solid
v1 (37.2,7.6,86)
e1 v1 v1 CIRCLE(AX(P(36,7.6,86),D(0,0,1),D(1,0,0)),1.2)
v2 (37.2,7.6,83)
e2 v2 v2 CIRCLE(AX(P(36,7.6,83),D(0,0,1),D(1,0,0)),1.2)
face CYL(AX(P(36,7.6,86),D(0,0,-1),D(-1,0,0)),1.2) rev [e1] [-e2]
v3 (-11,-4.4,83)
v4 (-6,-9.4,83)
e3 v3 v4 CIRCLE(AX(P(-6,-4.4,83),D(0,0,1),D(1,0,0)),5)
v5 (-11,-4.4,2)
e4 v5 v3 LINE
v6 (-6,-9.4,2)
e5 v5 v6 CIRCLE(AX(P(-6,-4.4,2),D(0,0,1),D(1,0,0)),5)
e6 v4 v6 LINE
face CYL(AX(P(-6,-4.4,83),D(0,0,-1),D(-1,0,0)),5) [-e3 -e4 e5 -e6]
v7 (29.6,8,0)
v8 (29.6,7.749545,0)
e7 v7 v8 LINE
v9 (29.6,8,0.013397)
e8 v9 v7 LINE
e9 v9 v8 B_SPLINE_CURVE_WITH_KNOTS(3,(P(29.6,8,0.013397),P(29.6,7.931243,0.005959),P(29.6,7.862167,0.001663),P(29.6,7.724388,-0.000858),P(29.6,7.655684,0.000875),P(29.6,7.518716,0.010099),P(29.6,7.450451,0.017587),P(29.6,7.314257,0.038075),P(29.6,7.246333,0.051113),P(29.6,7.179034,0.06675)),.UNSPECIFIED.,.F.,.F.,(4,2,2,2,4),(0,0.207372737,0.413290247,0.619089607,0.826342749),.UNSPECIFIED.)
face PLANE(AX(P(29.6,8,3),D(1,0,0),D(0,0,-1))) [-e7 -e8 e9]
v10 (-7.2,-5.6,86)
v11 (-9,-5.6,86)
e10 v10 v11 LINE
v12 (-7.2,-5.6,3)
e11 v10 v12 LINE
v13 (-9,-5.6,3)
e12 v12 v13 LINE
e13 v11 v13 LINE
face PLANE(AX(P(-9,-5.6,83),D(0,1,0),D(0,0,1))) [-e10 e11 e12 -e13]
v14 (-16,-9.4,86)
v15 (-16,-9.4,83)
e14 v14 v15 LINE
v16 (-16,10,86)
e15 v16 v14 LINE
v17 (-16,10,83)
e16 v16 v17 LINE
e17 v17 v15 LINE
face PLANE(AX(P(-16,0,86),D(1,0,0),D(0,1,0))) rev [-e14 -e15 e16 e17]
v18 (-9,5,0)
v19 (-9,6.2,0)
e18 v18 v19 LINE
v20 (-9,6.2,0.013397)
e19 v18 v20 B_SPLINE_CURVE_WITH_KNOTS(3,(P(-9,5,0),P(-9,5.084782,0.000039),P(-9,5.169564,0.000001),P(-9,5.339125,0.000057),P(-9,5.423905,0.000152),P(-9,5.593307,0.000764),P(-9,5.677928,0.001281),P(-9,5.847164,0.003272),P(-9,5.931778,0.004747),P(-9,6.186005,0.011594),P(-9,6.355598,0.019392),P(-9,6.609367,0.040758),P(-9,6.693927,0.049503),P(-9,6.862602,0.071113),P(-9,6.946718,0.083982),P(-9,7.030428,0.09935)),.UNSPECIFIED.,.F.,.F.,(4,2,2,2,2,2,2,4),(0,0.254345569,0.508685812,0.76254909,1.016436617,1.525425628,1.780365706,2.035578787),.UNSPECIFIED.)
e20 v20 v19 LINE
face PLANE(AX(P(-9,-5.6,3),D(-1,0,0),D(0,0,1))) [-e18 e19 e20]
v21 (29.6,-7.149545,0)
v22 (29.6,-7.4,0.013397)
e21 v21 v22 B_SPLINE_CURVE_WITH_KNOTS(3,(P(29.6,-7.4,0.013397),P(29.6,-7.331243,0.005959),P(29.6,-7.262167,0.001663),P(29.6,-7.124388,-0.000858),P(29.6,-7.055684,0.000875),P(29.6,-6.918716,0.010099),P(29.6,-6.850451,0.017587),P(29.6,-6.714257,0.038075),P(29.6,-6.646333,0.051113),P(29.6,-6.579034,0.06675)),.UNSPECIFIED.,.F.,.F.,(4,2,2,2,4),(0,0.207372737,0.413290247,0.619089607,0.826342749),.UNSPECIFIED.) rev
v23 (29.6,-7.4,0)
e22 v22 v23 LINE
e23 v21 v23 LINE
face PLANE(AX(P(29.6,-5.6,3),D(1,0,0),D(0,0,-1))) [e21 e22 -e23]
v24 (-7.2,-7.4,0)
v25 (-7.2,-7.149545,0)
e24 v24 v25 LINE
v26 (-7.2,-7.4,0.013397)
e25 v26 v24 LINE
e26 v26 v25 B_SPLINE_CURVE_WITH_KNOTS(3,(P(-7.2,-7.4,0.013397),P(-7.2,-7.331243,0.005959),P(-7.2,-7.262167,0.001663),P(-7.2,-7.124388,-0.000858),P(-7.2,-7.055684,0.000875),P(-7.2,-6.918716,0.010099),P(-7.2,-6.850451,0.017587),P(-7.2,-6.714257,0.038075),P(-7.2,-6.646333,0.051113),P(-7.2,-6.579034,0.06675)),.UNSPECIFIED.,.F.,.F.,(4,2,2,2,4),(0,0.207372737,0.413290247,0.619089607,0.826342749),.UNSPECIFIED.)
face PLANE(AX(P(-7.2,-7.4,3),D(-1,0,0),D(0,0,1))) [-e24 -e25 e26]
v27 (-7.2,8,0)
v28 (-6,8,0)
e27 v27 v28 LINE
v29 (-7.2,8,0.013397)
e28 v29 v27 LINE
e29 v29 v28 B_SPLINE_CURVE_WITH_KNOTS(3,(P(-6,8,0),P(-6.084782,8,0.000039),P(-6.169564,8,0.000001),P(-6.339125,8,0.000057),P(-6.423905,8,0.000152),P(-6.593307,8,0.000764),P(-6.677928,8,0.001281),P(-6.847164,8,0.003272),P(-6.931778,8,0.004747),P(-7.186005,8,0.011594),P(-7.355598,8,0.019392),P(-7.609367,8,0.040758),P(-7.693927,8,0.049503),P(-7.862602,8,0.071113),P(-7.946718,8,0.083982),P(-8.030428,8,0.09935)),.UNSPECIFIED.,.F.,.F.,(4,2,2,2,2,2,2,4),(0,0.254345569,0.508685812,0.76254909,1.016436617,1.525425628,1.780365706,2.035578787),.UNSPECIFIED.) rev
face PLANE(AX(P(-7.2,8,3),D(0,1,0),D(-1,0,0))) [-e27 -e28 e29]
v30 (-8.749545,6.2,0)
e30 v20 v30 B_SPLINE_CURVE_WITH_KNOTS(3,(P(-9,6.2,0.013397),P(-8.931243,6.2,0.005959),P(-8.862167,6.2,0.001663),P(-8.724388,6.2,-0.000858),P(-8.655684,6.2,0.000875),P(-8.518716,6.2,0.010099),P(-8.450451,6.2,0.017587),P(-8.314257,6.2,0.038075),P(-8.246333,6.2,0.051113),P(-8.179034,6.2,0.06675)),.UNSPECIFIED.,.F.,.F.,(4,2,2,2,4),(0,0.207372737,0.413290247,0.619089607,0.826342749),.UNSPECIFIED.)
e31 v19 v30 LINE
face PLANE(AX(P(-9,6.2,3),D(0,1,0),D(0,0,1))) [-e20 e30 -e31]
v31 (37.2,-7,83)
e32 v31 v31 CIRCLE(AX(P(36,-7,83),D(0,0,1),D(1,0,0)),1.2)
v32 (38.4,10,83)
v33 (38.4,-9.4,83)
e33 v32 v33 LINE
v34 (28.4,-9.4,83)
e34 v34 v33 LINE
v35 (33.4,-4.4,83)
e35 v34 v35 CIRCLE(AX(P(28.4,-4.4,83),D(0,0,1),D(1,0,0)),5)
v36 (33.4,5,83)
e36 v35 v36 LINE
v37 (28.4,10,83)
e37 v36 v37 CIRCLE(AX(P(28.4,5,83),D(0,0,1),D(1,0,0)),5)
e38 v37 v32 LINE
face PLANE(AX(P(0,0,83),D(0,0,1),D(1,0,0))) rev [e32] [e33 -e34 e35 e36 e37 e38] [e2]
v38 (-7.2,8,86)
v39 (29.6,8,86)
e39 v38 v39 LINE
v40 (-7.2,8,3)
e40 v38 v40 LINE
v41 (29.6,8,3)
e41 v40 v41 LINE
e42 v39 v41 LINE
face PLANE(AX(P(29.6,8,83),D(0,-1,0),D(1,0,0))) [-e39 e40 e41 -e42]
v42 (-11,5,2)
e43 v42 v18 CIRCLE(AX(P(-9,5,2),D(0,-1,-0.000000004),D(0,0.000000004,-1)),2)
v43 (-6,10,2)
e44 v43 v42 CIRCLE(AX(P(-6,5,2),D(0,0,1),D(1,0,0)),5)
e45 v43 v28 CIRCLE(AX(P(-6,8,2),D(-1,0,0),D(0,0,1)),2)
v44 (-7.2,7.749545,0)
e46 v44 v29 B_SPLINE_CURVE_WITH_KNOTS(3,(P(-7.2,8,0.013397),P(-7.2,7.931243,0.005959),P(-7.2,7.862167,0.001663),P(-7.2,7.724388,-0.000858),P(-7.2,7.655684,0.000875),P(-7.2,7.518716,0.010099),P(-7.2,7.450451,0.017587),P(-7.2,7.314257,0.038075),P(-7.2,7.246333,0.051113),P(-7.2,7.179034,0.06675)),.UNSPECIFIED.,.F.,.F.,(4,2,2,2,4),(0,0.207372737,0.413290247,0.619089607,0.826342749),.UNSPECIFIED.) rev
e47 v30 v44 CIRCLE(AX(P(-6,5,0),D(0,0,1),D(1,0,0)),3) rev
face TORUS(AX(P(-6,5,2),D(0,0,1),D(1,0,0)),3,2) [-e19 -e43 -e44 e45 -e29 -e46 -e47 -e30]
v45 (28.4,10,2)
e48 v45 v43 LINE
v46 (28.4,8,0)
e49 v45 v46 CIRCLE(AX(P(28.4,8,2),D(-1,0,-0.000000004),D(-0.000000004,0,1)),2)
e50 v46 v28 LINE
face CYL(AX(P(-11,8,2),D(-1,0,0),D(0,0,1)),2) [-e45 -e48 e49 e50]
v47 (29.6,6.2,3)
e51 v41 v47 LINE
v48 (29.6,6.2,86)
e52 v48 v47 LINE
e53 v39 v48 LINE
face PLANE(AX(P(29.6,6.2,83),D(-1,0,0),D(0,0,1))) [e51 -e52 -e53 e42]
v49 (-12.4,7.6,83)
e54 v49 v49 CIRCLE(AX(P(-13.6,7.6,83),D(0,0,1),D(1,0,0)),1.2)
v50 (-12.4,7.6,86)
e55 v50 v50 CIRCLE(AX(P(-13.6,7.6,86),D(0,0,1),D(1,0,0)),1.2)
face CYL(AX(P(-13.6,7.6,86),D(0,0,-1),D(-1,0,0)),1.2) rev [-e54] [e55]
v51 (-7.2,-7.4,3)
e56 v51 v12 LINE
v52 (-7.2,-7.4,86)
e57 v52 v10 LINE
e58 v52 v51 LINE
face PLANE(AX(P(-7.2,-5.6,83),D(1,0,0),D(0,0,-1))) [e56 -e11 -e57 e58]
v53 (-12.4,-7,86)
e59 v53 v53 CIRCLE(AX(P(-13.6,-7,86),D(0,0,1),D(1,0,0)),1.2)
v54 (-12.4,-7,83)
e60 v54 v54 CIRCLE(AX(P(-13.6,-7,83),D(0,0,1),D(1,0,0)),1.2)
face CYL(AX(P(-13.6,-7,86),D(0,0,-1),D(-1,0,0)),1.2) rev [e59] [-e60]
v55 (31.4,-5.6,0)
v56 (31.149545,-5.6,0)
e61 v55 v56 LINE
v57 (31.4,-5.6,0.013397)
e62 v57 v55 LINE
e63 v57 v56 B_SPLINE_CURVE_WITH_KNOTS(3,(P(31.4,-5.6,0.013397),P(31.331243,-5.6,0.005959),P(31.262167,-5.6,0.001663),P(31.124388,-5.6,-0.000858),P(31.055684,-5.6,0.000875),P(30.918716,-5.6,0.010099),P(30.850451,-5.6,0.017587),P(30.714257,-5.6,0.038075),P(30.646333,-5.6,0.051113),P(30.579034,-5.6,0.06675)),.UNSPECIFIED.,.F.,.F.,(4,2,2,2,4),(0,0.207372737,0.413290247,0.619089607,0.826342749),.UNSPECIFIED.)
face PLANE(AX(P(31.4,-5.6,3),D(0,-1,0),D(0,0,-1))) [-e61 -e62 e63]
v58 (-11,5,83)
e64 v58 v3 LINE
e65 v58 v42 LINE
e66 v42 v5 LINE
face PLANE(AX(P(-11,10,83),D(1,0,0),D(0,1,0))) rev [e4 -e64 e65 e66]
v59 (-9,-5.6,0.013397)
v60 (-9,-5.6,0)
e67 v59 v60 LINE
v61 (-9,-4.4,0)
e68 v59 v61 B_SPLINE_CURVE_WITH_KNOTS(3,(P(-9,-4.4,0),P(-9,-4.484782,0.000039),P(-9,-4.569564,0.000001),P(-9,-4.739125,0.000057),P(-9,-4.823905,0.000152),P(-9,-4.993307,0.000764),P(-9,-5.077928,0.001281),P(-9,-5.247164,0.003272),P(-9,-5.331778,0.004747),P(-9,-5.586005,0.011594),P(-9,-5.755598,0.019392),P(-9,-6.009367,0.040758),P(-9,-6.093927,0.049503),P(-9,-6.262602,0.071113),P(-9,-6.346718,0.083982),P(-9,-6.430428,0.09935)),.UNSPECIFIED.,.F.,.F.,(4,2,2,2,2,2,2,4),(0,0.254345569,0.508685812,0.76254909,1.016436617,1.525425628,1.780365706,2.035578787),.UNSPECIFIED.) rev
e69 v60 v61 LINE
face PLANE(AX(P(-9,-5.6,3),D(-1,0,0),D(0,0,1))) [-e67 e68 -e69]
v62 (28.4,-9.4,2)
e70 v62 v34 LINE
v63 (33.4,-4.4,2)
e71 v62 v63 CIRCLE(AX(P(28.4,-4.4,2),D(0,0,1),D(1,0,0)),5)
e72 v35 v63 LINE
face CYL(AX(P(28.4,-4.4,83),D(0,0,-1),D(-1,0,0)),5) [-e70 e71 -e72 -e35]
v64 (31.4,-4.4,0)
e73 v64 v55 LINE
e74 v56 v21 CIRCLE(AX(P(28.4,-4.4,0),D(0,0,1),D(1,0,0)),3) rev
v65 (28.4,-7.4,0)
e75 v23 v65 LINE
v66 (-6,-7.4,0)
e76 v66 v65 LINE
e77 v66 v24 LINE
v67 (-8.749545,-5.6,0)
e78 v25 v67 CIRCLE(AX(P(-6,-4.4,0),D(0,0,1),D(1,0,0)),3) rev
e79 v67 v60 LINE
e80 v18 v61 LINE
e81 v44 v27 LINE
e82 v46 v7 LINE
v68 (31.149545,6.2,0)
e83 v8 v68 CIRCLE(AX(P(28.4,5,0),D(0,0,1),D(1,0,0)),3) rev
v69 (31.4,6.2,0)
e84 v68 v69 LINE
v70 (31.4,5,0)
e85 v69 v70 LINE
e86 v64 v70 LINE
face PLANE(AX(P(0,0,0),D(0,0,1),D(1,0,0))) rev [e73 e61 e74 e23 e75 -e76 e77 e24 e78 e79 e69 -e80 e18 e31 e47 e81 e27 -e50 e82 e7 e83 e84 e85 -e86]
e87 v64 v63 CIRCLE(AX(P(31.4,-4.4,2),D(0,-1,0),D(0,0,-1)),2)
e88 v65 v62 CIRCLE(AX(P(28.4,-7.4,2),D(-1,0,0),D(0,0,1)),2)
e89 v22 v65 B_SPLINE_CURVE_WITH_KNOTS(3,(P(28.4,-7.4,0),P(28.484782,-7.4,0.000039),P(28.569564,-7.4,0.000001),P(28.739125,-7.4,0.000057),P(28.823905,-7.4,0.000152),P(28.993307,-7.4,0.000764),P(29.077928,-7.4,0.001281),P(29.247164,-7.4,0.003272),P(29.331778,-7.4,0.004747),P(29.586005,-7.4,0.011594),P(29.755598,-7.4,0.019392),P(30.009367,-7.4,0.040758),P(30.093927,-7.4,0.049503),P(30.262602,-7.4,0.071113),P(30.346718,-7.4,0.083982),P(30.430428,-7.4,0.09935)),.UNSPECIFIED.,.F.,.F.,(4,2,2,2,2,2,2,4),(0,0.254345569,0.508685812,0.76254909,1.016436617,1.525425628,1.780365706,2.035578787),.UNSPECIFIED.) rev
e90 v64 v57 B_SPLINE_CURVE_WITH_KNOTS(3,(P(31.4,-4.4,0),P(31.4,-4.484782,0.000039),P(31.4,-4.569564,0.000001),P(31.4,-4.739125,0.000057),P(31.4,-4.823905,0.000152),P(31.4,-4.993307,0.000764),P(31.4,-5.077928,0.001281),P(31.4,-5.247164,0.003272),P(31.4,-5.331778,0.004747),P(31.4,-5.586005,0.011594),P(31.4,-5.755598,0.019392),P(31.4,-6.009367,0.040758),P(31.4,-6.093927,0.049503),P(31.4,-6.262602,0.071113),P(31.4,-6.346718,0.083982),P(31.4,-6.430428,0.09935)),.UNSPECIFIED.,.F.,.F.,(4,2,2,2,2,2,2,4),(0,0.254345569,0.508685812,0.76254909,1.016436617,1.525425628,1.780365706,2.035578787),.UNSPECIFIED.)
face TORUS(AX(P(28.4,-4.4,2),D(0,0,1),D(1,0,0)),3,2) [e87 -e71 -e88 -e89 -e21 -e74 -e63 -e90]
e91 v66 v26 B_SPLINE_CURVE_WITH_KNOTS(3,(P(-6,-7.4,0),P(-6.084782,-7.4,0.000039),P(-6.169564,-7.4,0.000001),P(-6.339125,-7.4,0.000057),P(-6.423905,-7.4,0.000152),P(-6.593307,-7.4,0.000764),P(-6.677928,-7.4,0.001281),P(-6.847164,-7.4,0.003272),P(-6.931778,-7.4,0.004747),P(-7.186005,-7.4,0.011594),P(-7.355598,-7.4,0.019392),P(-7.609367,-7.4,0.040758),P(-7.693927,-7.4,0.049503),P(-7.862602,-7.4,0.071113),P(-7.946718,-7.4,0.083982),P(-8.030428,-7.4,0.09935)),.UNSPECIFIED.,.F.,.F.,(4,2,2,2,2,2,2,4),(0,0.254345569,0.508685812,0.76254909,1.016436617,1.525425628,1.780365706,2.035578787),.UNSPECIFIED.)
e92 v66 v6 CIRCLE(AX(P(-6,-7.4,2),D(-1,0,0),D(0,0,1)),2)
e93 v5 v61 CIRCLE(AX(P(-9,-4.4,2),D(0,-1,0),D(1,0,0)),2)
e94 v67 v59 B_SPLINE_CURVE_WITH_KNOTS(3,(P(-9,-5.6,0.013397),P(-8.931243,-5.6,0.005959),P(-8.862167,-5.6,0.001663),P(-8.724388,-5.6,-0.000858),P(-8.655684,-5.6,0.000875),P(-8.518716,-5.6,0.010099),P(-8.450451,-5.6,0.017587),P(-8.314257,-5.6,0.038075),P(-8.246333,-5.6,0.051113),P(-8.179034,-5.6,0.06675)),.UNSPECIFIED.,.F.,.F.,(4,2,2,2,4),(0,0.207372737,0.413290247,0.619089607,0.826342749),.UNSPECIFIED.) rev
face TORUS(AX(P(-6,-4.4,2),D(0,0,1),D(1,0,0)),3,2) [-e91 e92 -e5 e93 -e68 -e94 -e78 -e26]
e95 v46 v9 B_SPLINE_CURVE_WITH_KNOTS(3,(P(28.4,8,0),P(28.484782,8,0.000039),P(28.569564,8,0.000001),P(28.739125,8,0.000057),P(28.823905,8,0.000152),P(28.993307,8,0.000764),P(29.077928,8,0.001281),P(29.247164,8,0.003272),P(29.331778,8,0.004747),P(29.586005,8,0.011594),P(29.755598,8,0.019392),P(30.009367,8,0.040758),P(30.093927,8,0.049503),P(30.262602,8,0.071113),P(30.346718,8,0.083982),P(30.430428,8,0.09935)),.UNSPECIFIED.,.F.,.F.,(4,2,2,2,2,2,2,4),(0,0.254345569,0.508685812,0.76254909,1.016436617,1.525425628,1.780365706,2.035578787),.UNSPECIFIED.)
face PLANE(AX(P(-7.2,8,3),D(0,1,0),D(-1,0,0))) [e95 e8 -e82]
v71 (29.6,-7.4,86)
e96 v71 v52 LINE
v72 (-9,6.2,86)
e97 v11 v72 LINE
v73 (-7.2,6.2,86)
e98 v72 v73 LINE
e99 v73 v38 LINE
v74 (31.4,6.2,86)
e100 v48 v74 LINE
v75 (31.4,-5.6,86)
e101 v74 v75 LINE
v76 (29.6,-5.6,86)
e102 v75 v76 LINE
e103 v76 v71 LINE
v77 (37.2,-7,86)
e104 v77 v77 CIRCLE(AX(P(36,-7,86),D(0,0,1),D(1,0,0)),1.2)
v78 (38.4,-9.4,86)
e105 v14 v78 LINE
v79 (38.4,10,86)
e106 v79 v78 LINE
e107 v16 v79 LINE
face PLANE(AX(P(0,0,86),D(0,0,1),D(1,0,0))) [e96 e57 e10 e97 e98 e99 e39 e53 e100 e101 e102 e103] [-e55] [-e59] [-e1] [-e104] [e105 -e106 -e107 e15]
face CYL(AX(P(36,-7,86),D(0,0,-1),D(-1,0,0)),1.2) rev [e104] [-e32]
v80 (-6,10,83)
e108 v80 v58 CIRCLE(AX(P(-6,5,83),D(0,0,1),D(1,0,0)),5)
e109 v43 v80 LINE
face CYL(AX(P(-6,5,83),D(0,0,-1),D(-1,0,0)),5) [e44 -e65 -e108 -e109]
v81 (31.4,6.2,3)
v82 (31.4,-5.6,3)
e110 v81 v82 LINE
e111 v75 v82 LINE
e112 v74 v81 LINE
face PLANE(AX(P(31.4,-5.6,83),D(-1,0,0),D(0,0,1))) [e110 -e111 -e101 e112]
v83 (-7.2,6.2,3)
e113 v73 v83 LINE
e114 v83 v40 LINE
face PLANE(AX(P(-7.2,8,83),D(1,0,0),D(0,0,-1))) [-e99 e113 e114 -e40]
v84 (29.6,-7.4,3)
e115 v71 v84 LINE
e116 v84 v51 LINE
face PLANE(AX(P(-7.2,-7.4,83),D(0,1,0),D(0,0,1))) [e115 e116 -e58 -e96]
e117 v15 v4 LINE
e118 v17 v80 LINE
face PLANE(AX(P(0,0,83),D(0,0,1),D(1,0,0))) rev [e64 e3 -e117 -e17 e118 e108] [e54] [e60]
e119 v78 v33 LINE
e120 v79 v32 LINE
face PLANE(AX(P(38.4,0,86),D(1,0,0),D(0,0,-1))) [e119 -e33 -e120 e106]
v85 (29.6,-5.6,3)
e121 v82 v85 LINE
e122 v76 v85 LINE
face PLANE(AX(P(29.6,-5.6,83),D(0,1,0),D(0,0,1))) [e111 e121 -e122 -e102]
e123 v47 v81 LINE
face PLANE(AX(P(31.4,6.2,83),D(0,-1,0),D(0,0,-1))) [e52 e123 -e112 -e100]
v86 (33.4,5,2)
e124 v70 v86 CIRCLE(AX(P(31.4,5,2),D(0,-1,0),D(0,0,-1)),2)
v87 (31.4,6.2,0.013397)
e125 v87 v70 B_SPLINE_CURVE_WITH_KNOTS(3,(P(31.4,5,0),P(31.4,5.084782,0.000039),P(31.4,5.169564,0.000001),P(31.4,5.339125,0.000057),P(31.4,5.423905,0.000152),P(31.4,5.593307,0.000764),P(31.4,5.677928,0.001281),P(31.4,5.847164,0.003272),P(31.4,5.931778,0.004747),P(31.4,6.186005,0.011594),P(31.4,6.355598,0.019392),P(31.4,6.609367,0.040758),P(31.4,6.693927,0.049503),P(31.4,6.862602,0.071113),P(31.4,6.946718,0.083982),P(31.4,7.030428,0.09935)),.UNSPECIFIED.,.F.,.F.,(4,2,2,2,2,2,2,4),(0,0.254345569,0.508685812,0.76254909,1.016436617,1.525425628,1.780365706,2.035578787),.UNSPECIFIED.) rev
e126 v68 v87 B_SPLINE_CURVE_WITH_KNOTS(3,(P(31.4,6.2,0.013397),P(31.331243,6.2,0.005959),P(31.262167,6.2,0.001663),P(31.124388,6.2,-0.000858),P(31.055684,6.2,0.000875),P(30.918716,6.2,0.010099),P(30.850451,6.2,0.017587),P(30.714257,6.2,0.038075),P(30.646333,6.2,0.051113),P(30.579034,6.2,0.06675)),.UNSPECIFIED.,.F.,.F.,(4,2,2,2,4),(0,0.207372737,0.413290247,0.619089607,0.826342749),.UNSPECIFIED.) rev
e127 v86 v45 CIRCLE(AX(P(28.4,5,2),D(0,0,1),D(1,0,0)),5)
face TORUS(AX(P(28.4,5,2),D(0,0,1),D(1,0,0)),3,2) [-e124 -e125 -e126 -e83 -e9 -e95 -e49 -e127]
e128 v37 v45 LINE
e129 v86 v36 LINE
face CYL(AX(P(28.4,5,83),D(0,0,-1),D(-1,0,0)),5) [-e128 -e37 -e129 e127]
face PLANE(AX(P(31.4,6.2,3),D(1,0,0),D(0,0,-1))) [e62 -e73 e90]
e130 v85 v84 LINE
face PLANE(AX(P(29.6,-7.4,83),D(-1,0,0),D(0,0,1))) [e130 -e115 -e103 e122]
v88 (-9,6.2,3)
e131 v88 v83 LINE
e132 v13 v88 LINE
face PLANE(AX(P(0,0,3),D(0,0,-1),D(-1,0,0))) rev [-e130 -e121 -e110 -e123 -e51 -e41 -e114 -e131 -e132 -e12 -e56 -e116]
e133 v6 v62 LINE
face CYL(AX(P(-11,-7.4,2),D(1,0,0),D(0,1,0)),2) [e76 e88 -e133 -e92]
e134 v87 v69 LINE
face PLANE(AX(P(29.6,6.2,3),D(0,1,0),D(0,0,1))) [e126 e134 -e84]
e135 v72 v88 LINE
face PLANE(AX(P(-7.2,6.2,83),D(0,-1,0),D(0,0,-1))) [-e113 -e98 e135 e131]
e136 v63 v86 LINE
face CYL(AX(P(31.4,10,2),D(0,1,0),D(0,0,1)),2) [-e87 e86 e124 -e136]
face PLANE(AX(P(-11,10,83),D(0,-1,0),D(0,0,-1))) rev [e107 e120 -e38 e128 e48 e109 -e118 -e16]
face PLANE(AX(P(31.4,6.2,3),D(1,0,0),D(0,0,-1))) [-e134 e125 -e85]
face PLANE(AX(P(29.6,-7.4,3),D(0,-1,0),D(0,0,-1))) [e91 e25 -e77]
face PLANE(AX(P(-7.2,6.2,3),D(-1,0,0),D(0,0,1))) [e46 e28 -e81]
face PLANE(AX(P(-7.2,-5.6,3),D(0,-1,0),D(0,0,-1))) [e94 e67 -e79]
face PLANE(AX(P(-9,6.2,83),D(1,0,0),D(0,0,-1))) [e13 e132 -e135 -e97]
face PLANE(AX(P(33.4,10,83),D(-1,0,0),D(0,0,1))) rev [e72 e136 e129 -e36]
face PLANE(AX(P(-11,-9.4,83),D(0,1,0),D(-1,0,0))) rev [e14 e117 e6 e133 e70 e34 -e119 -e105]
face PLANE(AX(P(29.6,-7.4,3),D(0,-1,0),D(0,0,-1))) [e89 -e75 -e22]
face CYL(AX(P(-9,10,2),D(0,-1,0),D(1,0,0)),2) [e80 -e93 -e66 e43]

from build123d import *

# Parameters (mm, degrees)
SKETCH_1_W      = 44.4
SKETCH_1_H      = 19.4
EXTRUDE_1_DEPTH = 83
FILLET_6_R      = 5
FILLET_7_R      = 5
FILLET_8_R      = 5
FILLET_9_R      = 5
FILLET_11_R     = 2
EXTRUDE_2_DEPTH = 3
EXTRUDE_START   = 3
SKETCH_3_R      = 1.2
EXTRUDE_3_DEPTH = 3


with BuildPart() as part:
    # 草图1 → 凸台-拉伸1 (new body)
    with BuildSketch(Plane.XY):
        with Locations((11.2, 0.3)):
            Rectangle(SKETCH_1_W, SKETCH_1_H)
        Polygon((-9, 6.2), (-9, -5.6), (-7.2, -5.6), (-7.2, -7.4), (29.6, -7.4), (29.6, -5.6), (31.4, -5.6), (31.4, 6.2), (29.6, 6.2), (29.6, 8), (-7.2, 8), (-7.2, 6.2), align=None, mode=Mode.SUBTRACT)
    extrude(amount=EXTRUDE_1_DEPTH)

    # 圆角6
    fillet_6_edges = [part.edges().sort_by_distance(p)[0] for p in [
        (-11, -9.4, 41.5),
    ]]
    fillet(fillet_6_edges, radius=FILLET_6_R)

    # 圆角7
    fillet_7_edges = [part.edges().sort_by_distance(p)[0] for p in [
        (-11, 10, 41.5),
    ]]
    fillet(fillet_7_edges, radius=FILLET_7_R)

    # 圆角8
    fillet_8_edges = [part.edges().sort_by_distance(p)[0] for p in [
        (33.4, 10, 41.5),
    ]]
    fillet(fillet_8_edges, radius=FILLET_8_R)

    # 圆角9
    fillet_9_edges = [part.edges().sort_by_distance(p)[0] for p in [
        (33.4, -9.4, 41.5),
    ]]
    fillet(fillet_9_edges, radius=FILLET_9_R)

    # 圆角11
    # the kernel refuses this fillet: 2 mm, written as the material it takes off along each edge
    with BuildSketch(Plane(origin=(28.4, -9.4, 0), x_dir=(0, 1, 0), z_dir=(-1, 0, 0)), Plane(origin=(-6, 10, 0), x_dir=(0, -1, 0), z_dir=(1, 0, 0))) as fillet_11_piece_1:
        with BuildLine():
            CenterArc((FILLET_11_R, -FILLET_11_R), FILLET_11_R, 90, 90)
            Line((0, -FILLET_11_R), (0, 0))
            Line((0, 0), (FILLET_11_R, 0))
        make_face()
    extrude(amount=34.4, mode=Mode.SUBTRACT)
    with BuildSketch(Plane(origin=(-6, -4.4, 0), x_dir=(0, -1, 0), z_dir=(1, 0, 0))) as fillet_11_piece_2:
        with BuildLine():
            CenterArc((5 - FILLET_11_R, -FILLET_11_R), FILLET_11_R, 0, 90)
            Line((5, -FILLET_11_R), (5, 0))
            Line((5, 0), (5 - FILLET_11_R, 0))
        make_face()
    revolve(axis=Axis((-6, -4.4, 0), (0, 0, -1)), revolution_arc=90, mode=Mode.SUBTRACT)
    with BuildSketch(Plane(origin=(-11, -4.4, 0), x_dir=(1, 0, 0), z_dir=(0, 1, 0)), Plane(origin=(33.4, 5, 0), x_dir=(-1, 0, 0), z_dir=(0, -1, 0))) as fillet_11_piece_3:
        with BuildLine():
            CenterArc((FILLET_11_R, -FILLET_11_R), FILLET_11_R, 90, 90)
            Line((0, -FILLET_11_R), (0, 0))
            Line((0, 0), (FILLET_11_R, 0))
        make_face()
    extrude(amount=9.4, mode=Mode.SUBTRACT)
    with BuildSketch(Plane(origin=(-6, 5, 0), x_dir=(-1, 0, 0), z_dir=(0, -1, 0))) as fillet_11_piece_4:
        with BuildLine():
            CenterArc((5 - FILLET_11_R, -FILLET_11_R), FILLET_11_R, 0, 90)
            Line((5, -FILLET_11_R), (5, 0))
            Line((5, 0), (5 - FILLET_11_R, 0))
        make_face()
    revolve(axis=Axis((-6, 5, 0), (0, 0, -1)), revolution_arc=90, mode=Mode.SUBTRACT)
    with BuildSketch(Plane(origin=(28.4, 5, 0), x_dir=(0, 1, 0), z_dir=(-1, 0, 0))) as fillet_11_piece_5:
        with BuildLine():
            CenterArc((5 - FILLET_11_R, -FILLET_11_R), FILLET_11_R, 0, 90)
            Line((5, -FILLET_11_R), (5, 0))
            Line((5, 0), (5 - FILLET_11_R, 0))
        make_face()
    revolve(axis=Axis((28.4, 5, 0), (0, 0, -1)), revolution_arc=90, mode=Mode.SUBTRACT)
    with BuildSketch(Plane(origin=(28.4, -4.4, 0), x_dir=(1, 0, 0), z_dir=(0, 1, 0))) as fillet_11_piece_6:
        with BuildLine():
            CenterArc((5 - FILLET_11_R, -FILLET_11_R), FILLET_11_R, 0, 90)
            Line((5, -FILLET_11_R), (5, 0))
            Line((5, 0), (5 - FILLET_11_R, 0))
        make_face()
    revolve(axis=Axis((28.4, -4.4, 0), (0, 0, -1)), revolution_arc=90, mode=Mode.SUBTRACT)

    # 草图2 → 凸台-拉伸2 (add)
    with BuildSketch(Plane(origin=(0, 0, 0), x_dir=(-1, 0, 0), z_dir=(0, 0, -1))):
        Polygon((-31.4, 6.2), (-31.4, -5.6), (-29.6, -5.6), (-29.6, -7.4), (7.2, -7.4), (7.2, -5.6), (9, -5.6), (9, 6.2), (7.2, 6.2), (7.2, 8), (-29.6, 8), (-29.6, 6.2), align=None)
    extrude(amount=-EXTRUDE_2_DEPTH)

    # 草图3 → 凸台-拉伸3 (add)
    # profile 1 of 3: a face of its own
    with BuildSketch(Plane.XY.offset(83).offset(EXTRUDE_START)):
        with BuildLine():
            Line((-6, 10), (-16, 10))
            Line((-16, 10), (-16, -9.4))
            Line((-16, -9.4), (-6, -9.4))
            ThreePointArc((-6, -9.4), (-9.535533906, -7.935533906), (-11, -4.4))
            Line((-11, -4.4), (-11, 5))
            ThreePointArc((-11, 5), (-9.535533906, 8.535533906), (-6, 10))
        make_face()
        with Locations((-13.6, -7)):
            Circle(SKETCH_3_R, mode=Mode.SUBTRACT)
        with Locations((-13.6, 7.6)):
            Circle(SKETCH_3_R, mode=Mode.SUBTRACT)
    # profile 2 of 3: a face of its own
    with BuildSketch(Plane.XY.offset(83).offset(EXTRUDE_START)):
        with BuildLine():
            Line((38.4, 10), (28.4, 10))
            ThreePointArc((28.4, 10), (31.935533906, 8.535533906), (33.4, 5))
            Line((33.4, 5), (33.4, -4.4))
            ThreePointArc((33.4, -4.4), (31.935533906, -7.935533906), (28.4, -9.4))
            Line((28.4, -9.4), (38.4, -9.4))
            Line((38.4, -9.4), (38.4, 10))
        make_face()
        with Locations((36, -7)):
            Circle(SKETCH_3_R, mode=Mode.SUBTRACT)
        with Locations((36, 7.6)):
            Circle(SKETCH_3_R, mode=Mode.SUBTRACT)
    # profile 3 of 3: a face of its own
    with BuildSketch(Plane.XY.offset(83).offset(EXTRUDE_START)):
        with BuildLine():
            ThreePointArc((-11, -4.4), (-9.535533906, -7.935533906), (-6, -9.4))
            Line((-6, -9.4), (28.4, -9.4))
            ThreePointArc((28.4, -9.4), (31.935533906, -7.935533906), (33.4, -4.4))
            Line((33.4, -4.4), (33.4, 5))
            ThreePointArc((33.4, 5), (31.935533906, 8.535533906), (28.4, 10))
            Line((28.4, 10), (-6, 10))
            ThreePointArc((-6, 10), (-9.535533906, 8.535533906), (-11, 5))
            Line((-11, 5), (-11, -4.4))
        make_face()
        Polygon((-7.2, -5.6), (-9, -5.6), (-9, 6.2), (-7.2, 6.2), (-7.2, 8), (29.6, 8), (29.6, 6.2), (31.4, 6.2), (31.4, -5.6), (29.6, -5.6), (29.6, -7.4), (-7.2, -7.4), align=None, mode=Mode.SUBTRACT)
    extrude(amount=-EXTRUDE_3_DEPTH)


solid = part.part
